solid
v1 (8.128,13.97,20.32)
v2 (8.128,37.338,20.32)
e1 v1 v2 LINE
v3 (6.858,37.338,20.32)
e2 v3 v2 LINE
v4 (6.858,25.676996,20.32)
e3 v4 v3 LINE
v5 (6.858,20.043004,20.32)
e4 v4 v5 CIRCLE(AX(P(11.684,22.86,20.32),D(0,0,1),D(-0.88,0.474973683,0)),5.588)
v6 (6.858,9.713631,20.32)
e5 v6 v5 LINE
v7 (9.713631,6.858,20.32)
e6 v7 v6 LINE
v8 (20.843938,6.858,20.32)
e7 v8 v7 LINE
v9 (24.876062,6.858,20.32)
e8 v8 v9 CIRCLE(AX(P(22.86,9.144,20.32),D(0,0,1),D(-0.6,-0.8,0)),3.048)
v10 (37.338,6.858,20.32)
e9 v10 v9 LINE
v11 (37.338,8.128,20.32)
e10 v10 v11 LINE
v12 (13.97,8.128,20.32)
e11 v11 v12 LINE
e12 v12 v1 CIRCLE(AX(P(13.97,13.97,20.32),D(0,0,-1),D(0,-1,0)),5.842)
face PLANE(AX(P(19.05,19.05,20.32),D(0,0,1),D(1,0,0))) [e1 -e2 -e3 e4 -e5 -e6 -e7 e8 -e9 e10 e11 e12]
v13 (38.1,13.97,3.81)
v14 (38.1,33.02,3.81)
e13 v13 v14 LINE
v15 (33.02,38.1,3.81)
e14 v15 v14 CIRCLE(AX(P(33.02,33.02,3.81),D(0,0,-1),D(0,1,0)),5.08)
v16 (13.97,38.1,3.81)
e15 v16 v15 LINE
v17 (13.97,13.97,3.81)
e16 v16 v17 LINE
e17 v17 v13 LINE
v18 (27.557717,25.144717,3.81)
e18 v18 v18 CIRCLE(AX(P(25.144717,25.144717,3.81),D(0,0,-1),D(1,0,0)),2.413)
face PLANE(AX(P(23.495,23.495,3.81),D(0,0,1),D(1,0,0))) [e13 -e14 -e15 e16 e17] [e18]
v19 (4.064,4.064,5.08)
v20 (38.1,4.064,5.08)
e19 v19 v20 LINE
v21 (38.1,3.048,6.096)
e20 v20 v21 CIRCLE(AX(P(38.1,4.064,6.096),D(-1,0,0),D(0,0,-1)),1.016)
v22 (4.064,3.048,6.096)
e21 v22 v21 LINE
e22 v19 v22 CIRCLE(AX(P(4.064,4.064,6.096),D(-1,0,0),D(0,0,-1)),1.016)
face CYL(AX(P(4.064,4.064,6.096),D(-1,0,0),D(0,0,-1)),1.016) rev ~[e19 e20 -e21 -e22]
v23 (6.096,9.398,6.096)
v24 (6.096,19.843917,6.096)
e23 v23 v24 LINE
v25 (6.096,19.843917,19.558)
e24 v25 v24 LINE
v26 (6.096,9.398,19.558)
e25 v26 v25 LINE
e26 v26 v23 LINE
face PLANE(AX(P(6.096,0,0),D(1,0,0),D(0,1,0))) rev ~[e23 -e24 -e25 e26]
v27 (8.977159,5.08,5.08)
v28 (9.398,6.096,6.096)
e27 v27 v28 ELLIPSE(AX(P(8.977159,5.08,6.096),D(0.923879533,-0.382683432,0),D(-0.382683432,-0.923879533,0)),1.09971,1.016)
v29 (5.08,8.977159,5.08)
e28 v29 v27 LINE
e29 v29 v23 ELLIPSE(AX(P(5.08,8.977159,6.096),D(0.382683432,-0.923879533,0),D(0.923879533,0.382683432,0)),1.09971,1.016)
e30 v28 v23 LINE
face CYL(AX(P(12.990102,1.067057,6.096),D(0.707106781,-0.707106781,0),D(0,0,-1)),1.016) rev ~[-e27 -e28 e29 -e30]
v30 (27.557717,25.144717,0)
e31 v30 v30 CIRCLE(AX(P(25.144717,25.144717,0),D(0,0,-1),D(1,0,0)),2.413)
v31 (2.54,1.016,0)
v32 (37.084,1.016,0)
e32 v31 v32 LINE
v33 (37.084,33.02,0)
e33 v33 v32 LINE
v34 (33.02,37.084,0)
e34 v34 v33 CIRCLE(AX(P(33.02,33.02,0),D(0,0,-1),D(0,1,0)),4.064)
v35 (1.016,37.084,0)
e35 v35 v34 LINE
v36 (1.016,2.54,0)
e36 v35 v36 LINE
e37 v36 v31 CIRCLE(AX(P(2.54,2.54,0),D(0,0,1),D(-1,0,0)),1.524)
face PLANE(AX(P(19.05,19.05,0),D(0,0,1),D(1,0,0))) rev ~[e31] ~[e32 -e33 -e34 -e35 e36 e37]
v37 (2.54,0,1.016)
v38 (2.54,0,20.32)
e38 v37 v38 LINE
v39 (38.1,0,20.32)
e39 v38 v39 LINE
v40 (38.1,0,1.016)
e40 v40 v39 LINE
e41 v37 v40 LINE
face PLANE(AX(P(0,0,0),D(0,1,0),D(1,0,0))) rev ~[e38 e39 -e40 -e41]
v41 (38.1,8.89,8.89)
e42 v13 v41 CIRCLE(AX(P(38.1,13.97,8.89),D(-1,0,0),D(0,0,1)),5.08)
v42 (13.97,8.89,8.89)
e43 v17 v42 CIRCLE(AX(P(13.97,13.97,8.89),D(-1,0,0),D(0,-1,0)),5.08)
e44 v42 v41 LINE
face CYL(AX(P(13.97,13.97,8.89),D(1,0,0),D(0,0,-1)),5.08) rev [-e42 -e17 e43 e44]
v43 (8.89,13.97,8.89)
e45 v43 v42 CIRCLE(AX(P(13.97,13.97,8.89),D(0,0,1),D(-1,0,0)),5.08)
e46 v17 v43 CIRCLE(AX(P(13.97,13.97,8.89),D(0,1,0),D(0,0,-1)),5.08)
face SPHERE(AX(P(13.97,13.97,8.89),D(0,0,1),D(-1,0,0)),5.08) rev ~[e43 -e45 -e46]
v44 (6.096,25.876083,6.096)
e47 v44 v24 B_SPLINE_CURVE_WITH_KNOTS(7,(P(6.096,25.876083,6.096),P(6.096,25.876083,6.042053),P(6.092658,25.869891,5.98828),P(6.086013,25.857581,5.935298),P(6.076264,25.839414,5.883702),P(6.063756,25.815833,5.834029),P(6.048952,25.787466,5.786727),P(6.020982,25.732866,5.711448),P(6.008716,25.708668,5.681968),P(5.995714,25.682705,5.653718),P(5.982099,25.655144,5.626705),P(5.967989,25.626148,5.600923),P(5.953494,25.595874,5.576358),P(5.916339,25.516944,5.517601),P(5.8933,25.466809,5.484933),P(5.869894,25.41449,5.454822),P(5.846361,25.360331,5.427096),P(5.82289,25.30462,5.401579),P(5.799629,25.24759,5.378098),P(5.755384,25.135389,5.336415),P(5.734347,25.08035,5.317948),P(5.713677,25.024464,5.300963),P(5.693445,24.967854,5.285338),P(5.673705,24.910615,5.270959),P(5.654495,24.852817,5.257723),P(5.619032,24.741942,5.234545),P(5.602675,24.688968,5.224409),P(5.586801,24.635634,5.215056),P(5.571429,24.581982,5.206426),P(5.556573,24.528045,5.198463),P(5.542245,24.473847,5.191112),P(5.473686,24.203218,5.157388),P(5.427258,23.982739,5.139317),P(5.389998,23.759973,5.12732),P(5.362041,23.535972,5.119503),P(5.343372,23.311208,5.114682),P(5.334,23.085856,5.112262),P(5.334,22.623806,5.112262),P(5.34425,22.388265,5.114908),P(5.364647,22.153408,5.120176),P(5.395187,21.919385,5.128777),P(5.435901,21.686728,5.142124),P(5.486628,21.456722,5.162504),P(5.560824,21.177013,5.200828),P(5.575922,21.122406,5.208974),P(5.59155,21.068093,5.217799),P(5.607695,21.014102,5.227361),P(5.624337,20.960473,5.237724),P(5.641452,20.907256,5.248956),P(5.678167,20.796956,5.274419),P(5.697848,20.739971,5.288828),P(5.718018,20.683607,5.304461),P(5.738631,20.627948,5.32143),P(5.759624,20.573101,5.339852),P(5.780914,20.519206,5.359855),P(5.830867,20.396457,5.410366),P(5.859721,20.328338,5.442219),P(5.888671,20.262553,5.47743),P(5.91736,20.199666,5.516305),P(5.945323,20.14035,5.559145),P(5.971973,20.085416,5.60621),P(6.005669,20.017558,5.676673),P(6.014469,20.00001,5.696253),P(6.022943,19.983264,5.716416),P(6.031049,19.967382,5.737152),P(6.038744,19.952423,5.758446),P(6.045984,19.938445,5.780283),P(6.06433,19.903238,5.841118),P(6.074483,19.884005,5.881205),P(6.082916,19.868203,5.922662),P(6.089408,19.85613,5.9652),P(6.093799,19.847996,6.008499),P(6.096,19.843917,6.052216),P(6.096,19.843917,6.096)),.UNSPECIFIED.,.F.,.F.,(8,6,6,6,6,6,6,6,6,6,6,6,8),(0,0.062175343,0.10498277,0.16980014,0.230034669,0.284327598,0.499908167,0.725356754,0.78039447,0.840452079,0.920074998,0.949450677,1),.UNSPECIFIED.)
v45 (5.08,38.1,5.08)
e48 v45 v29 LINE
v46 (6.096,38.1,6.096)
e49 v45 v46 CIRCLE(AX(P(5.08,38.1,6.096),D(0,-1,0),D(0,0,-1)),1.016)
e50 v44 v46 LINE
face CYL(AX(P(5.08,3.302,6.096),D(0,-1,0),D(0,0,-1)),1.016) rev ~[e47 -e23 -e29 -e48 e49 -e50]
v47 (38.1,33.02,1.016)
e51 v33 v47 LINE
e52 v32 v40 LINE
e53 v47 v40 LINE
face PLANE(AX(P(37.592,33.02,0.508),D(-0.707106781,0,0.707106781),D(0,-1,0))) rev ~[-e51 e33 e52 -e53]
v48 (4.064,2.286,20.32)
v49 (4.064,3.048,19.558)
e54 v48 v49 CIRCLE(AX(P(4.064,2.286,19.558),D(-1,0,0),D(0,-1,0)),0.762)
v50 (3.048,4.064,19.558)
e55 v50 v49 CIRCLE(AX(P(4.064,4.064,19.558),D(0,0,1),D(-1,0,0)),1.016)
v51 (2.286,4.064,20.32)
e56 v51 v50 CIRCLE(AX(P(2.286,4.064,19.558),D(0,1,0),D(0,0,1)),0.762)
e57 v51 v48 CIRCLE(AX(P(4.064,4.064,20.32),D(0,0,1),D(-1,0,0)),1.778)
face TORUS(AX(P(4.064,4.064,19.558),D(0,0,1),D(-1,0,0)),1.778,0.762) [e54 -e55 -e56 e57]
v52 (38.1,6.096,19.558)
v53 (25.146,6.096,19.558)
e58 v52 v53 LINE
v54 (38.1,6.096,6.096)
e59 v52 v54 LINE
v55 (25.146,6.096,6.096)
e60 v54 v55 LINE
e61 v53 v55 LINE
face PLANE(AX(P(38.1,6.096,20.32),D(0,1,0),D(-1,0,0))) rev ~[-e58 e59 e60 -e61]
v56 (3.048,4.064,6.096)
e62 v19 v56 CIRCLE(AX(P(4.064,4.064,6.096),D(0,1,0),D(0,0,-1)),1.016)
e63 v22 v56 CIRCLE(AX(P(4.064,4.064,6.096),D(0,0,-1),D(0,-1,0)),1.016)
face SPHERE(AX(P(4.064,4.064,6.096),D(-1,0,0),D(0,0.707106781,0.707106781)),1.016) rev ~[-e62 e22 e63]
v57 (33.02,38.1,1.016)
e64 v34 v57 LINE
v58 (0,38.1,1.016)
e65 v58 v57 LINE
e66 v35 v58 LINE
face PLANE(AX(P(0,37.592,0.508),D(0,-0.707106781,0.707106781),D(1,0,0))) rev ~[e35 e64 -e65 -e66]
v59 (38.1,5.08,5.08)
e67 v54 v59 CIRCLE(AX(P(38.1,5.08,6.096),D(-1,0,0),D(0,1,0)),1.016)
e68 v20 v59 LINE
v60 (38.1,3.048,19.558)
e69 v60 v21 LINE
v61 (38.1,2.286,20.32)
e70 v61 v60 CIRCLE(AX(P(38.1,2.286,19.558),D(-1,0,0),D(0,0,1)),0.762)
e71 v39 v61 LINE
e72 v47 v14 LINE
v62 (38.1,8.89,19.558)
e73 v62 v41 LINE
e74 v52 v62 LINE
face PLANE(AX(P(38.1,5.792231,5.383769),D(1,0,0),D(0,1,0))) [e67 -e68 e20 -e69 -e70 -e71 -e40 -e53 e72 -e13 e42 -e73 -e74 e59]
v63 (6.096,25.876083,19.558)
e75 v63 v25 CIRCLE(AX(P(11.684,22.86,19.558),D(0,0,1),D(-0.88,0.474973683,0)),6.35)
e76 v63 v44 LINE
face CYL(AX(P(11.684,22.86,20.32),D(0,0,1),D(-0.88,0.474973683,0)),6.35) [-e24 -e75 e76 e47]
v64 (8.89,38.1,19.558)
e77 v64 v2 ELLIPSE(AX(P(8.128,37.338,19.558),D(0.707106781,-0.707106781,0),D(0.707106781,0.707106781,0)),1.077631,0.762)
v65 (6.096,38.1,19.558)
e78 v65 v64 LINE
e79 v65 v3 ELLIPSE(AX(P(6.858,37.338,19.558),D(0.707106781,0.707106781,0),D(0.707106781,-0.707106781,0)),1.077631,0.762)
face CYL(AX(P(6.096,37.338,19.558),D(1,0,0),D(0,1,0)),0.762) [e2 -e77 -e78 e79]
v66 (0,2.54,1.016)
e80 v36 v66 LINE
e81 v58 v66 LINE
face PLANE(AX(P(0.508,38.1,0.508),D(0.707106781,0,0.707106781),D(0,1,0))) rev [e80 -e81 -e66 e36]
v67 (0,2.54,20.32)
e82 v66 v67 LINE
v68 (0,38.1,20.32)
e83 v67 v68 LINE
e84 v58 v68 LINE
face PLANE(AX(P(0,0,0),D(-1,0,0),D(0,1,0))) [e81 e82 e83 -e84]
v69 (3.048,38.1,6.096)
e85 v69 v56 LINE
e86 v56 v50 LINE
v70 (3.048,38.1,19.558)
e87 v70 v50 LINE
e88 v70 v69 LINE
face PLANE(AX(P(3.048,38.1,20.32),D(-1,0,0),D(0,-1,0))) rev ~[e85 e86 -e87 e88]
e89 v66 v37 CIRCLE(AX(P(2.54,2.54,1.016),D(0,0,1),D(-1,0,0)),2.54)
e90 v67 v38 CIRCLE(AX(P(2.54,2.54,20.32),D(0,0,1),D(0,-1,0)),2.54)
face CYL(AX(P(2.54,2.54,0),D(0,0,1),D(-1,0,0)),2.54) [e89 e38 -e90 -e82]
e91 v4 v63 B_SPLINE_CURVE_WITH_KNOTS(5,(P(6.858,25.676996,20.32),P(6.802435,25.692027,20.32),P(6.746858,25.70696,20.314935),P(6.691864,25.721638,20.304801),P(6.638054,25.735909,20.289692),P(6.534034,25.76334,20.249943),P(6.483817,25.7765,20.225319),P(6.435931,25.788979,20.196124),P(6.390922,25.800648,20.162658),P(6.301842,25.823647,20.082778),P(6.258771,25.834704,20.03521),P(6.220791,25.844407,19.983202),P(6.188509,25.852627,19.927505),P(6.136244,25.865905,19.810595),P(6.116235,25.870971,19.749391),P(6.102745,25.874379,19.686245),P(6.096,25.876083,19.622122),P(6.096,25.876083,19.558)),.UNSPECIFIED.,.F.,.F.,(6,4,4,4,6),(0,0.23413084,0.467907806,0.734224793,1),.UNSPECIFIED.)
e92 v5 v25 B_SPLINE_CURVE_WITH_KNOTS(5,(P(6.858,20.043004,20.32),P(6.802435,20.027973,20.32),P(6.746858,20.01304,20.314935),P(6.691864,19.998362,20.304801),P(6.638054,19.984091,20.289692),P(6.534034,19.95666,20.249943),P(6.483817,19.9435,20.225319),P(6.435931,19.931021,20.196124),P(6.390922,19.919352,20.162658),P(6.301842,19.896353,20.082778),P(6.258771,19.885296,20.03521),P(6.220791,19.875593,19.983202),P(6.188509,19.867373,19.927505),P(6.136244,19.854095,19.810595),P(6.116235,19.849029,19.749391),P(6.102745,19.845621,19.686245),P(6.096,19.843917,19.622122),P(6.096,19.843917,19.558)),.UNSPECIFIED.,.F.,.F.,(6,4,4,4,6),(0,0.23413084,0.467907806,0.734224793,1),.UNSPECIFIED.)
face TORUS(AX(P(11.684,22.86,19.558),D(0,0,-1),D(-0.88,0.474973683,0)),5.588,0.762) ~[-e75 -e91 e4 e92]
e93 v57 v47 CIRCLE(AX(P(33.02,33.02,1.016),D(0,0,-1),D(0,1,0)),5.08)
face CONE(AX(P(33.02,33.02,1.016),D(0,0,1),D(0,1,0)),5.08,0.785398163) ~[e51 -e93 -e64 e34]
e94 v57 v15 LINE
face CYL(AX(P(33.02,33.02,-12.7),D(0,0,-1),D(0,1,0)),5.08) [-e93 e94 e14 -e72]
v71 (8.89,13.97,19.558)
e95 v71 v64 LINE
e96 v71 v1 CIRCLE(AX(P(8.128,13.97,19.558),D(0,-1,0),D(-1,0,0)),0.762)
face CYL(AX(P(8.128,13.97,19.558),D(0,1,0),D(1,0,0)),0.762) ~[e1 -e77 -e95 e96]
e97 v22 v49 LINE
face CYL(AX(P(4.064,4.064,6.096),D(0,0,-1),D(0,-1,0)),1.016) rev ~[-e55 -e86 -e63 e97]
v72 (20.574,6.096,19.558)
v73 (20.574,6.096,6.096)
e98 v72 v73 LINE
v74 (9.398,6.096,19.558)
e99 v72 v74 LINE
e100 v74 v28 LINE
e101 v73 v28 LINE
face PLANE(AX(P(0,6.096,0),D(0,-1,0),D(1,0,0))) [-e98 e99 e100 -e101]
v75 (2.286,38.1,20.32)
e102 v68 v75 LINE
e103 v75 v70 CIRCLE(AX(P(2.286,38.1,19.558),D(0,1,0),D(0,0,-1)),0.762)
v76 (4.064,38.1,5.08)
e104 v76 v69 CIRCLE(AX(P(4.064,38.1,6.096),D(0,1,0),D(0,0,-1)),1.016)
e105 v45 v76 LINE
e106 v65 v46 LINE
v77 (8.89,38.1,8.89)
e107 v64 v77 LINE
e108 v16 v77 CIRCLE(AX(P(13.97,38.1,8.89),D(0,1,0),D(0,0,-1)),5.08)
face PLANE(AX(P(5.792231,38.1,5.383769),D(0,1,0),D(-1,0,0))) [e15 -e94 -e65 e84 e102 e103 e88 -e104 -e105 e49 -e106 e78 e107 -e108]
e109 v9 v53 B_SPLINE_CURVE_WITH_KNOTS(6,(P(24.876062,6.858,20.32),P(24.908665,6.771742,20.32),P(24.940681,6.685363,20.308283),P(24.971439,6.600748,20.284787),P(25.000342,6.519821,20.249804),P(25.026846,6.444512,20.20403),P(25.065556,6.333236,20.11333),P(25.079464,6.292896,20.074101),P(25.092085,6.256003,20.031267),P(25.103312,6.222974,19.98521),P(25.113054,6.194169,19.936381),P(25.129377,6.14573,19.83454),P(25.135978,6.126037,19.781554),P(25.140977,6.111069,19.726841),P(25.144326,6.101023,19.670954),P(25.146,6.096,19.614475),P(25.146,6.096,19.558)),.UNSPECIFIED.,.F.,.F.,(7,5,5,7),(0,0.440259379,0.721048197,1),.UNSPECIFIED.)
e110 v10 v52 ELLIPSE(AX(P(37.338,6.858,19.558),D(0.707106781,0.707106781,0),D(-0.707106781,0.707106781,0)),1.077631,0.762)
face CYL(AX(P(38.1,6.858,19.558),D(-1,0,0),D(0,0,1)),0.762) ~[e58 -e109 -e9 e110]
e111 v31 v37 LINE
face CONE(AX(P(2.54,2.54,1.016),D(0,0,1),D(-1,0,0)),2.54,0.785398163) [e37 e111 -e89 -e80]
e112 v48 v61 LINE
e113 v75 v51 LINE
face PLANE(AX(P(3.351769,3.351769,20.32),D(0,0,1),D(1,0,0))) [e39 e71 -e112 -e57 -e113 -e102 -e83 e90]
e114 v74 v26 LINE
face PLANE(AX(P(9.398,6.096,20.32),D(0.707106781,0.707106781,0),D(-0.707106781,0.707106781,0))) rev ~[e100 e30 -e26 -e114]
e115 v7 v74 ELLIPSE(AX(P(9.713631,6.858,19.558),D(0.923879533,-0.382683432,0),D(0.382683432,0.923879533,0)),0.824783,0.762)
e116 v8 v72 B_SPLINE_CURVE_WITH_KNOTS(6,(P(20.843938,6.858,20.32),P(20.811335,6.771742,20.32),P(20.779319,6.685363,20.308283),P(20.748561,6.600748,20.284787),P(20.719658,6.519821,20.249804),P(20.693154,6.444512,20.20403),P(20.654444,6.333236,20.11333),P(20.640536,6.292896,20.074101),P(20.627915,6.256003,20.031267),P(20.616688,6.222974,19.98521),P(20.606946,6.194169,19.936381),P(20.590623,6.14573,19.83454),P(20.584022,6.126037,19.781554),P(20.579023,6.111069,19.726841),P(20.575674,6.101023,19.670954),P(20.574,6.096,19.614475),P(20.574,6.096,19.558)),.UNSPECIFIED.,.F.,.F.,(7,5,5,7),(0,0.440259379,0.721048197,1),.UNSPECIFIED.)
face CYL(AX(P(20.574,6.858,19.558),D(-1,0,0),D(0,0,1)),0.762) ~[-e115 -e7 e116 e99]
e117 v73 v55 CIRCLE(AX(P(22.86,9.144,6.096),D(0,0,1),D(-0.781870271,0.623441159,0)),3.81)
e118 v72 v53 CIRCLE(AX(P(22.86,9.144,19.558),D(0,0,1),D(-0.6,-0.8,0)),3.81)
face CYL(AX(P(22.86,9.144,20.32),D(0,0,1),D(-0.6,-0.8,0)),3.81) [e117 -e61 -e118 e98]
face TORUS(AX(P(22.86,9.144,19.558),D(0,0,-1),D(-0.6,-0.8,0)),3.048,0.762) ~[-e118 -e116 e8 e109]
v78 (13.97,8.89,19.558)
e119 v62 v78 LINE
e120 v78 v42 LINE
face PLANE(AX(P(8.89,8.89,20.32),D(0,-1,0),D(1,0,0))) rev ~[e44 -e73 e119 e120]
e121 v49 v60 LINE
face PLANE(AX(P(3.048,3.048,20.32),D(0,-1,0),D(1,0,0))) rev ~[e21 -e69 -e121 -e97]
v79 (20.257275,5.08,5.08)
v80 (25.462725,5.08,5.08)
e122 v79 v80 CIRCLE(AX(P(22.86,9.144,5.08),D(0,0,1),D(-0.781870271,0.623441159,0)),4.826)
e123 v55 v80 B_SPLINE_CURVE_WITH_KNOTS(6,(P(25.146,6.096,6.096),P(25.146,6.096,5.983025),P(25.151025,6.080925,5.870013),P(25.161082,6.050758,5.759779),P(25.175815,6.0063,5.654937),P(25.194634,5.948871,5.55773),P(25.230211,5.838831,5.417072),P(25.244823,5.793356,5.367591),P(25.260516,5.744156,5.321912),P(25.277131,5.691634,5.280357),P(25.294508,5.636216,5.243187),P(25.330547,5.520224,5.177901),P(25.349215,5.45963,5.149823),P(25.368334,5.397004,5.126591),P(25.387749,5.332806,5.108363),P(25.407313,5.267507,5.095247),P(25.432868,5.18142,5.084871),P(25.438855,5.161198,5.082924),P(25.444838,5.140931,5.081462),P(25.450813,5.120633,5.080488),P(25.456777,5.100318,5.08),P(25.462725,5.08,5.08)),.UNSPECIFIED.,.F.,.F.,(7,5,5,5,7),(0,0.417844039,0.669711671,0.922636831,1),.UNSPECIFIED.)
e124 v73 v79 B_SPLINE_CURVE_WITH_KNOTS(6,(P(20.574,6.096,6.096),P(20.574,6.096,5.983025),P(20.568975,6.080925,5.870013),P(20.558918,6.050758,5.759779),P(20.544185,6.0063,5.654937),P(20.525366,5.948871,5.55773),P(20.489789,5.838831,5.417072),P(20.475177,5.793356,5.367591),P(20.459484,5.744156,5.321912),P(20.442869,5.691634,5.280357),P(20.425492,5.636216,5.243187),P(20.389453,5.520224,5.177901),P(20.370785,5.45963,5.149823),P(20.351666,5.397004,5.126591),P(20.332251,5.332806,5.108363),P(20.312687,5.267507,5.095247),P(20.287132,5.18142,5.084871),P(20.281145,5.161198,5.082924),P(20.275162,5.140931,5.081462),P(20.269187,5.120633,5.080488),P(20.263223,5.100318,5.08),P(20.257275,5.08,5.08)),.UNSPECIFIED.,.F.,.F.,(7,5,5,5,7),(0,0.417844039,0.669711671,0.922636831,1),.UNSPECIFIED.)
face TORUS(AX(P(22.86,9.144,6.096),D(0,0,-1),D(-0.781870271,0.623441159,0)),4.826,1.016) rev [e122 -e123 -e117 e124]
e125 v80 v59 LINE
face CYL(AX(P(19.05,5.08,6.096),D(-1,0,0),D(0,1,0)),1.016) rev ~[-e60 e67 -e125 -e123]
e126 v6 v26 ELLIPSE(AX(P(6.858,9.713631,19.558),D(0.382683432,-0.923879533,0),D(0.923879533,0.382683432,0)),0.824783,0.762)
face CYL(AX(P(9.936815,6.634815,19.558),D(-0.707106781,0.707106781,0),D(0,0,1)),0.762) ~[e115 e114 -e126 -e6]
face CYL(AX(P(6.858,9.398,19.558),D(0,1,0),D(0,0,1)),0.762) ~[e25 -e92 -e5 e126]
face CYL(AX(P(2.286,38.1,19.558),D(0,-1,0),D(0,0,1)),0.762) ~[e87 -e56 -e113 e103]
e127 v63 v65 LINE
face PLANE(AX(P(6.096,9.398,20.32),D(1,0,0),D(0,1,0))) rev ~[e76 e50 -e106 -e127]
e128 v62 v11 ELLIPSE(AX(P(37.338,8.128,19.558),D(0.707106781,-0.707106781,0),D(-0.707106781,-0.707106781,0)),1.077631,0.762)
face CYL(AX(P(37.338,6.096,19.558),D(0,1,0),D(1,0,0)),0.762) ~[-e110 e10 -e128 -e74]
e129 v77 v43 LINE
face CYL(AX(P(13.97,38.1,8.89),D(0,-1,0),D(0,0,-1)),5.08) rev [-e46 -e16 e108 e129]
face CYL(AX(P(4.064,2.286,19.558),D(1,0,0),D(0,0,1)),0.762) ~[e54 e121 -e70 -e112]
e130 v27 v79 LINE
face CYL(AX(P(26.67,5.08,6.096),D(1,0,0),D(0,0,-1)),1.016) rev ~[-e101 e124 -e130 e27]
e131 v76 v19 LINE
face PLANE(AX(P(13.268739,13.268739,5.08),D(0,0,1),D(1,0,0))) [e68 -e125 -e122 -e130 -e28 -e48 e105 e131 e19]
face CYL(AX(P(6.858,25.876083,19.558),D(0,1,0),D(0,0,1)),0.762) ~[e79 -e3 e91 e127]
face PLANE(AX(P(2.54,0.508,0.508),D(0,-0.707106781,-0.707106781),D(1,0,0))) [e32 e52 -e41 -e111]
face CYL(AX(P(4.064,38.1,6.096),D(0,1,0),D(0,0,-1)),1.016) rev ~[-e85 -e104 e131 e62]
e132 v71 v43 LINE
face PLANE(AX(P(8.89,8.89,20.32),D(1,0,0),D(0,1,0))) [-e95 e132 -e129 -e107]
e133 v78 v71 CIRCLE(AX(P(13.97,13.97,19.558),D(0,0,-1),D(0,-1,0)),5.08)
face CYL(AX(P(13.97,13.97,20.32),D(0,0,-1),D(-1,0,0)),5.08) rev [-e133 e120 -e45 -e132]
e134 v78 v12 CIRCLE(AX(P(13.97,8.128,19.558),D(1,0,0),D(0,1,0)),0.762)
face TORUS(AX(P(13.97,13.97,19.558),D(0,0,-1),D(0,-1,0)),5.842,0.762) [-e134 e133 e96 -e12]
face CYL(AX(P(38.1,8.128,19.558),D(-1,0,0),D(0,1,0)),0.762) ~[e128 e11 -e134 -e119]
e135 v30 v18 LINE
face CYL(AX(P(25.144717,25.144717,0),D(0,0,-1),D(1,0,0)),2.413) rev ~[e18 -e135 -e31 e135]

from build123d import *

# Parameters (mm, degrees)
F0_W          = 38.1
F0_H          = 38.1
F1_DEPTH      = 20.32
F2_W          = 29.21
F2_H          = 29.21
F3_DEPTH      = 16.51
F5_DEPTH      = 15.24
F6_T1_DEPTH   = 29.21
F7_R          = 5.08
F8_R          = 5.08
F9_R          = 2.54
F10_R         = 2.413
F11_DEPTH     = 20.321
F13_DEPTH     = 15.24
F14_T1_DEPTH  = 14.224
F14_T3_DEPTH  = 34.036
F14_T5_DEPTH  = 34.036
F14_T7_DEPTH  = 19.05
F14_T9_DEPTH  = 18.3199171099
F14_S13_W     = 1.03632
F14_S13_H     = 1.03632
F14_T14_DEPTH = 1.03632
F14_T20_DEPTH = 16.861733183
F14_T26_DEPTH = 22.6379171099
F14_T31_DEPTH = 23.368
F14_T36_ANGLE = 257.1357278548
F14_T42_DEPTH = 16.861733183
F14_T46_DEPTH = 23.368
F14_T53_DEPTH = 16.861733183
F14_T57_DEPTH = 22.6379171099
F15_SIZE      = 1.016
F16_R         = 0.762


# Not quite as in the source:
# - a fillet or chamfer that OpenCascade refuses, or shapes differently, is made with other operations: its cross-section is extruded or revolved along the edge and cut away or added


with BuildPart() as f1:
    # F0 (on Top) → F1 (new body)
    with BuildSketch(Plane.XY):
        with Locations((19.05, 19.05)):
            Rectangle(F0_W, F0_H)
    extrude(amount=F1_DEPTH)

    # F2 (on face) → F3 (cut)
    with BuildSketch(Plane.XY.offset(20.32)):
        with Locations((23.495, 23.495)):
            Rectangle(F2_W, F2_H)
    extrude(amount=-F3_DEPTH, mode=Mode.SUBTRACT)

    # F4 (on face) → F5 (cut)
    with BuildSketch(Plane.XY.offset(20.32)):
        Polygon((6.096, 38.1), (3.048, 38.1), (3.048, 3.048), (38.1, 3.048), (38.1, 6.096), (9.398, 6.096), (6.096, 6.096), (6.096, 9.398), align=None)
        Polygon((9.398, 6.096), (6.096, 9.398), (6.096, 6.096), align=None)
    extrude(amount=-F5_DEPTH, mode=Mode.SUBTRACT)

    # F6: fillet of radius 5.08 on 1 edges, made by hand

    # F6_s2 → F6_t1 (cut)
    with BuildSketch(Plane.XY.offset(-12.7)):
        with BuildLine():
            ThreePointArc((33.02, 38.1), (36.6121024484, 36.6121024484), (38.1, 33.02))
            Line((38.1, 33.02), (38.1, 38.1))
            Line((38.1, 38.1), (33.02, 38.1))
        make_face()
    extrude(amount=F6_T1_DEPTH, mode=Mode.SUBTRACT)

    # F7
    f7_edges = [f1.edges().sort_by_distance(p)[0] for p in [
        (8.89, 8.89, 12.065),
    ]]
    fillet(f7_edges, radius=F7_R)

    # F8
    f8_edges = [f1.edges().sort_by_distance(p)[0] for p in [
        (26.035, 8.89, 3.81),
        (10.377898, 10.377898, 3.81),
        (8.89, 26.035, 3.81),
    ]]
    fillet(f8_edges, radius=F8_R)

    # F9
    f9_edges = [f1.edges().sort_by_distance(p)[0] for p in [
        (0, 0, 10.16),
    ]]
    fillet(f9_edges, radius=F9_R)

    # F10 (on face) → F11 (cut, through all)
    with BuildSketch(Plane(origin=(0, 0, 0), x_dir=(1, 0, 0), z_dir=(0, 0, -1))):
        with Locations((25.144717139, -25.144717139)):
            Circle(F10_R)
    extrude(amount=-F11_DEPTH, mode=Mode.SUBTRACT)

    # F12 (on face) → F13 (join, through all)
    with BuildSketch(Plane.XY.offset(20.32)):
        with BuildLine():
            Line((25.146, 6.096), (20.574, 6.096))
            ThreePointArc((20.574, 6.096), (22.86, 5.334), (25.146, 6.096))
        make_face()
        with BuildLine():
            Line((6.096, 19.8439171099), (6.096, 25.8760828901))
            ThreePointArc((6.096, 25.8760828901), (5.334, 22.86), (6.096, 19.8439171099))
        make_face()
    extrude(amount=-F13_DEPTH)

    # F14: fillet of radius 1.016 on 9 edges, made by hand

    # F14_s2 → F14_t1 (join)
    with BuildSketch(Plane.XY.offset(6.096)):
        with BuildLine():
            ThreePointArc((4.064, 3.048), (3.3455795103, 3.3455795103), (3.048, 4.064))
            Line((3.048, 4.064), (3.02768, 4.064))
            Line((3.02768, 4.064), (3.02768, 3.02768))
            Line((3.02768, 3.02768), (4.064, 3.02768))
            Line((4.064, 3.02768), (4.064, 3.048))
        make_face()
    extrude(amount=F14_T1_DEPTH)

    # F14_s4 → F14_t3 (join)
    with BuildSketch(Plane.YZ.offset(4.064)):
        with BuildLine():
            ThreePointArc((4.064, 5.08), (3.3455795103, 5.3775795103), (3.048, 6.096))
            Line((3.048, 6.096), (3.02768, 6.096))
            Line((3.02768, 6.096), (3.02768, 5.05968))
            Line((3.02768, 5.05968), (4.064, 5.05968))
            Line((4.064, 5.05968), (4.064, 5.08))
        make_face()
    extrude(amount=F14_T3_DEPTH)

    # F14_s6 → F14_t5 (join)
    with BuildSketch(Plane.XZ.offset(-38.1)):
        with BuildLine():
            ThreePointArc((4.064, 5.08), (3.3455795103, 5.3775795103), (3.048, 6.096))
            Line((3.048, 6.096), (3.02768, 6.096))
            Line((3.02768, 6.096), (3.02768, 5.05968))
            Line((3.02768, 5.05968), (4.064, 5.05968))
            Line((4.064, 5.05968), (4.064, 5.08))
        make_face()
    extrude(amount=F14_T5_DEPTH)

    # F14_s8 → F14_t7 (join)
    with BuildSketch(Plane.YZ.offset(19.05)):
        with BuildLine():
            ThreePointArc((6.096, 6.096), (5.7984204897, 5.3775795103), (5.08, 5.08))
            Line((5.08, 5.08), (5.08, 5.05968))
            Line((5.08, 5.05968), (6.11632, 5.05968))
            Line((6.11632, 5.05968), (6.11632, 6.096))
            Line((6.11632, 6.096), (6.096, 6.096))
        make_face()
    extrude(amount=F14_T7_DEPTH)

    # F14_s10 → F14_t9 (join)
    with BuildSketch(Plane.XZ.offset(-38.1)):
        with BuildLine():
            ThreePointArc((5.08, 5.08), (5.7984204897, 5.3775795103), (6.096, 6.096))
            Line((6.096, 6.096), (6.11632, 6.096))
            Line((6.11632, 6.096), (6.11632, 5.05968))
            Line((6.11632, 5.05968), (5.08, 5.05968))
            Line((5.08, 5.05968), (5.08, 5.08))
        make_face()
    extrude(amount=F14_T9_DEPTH)


with BuildPart() as f14_tool12:
    # F14_s13 → F14_t14 (new body)
    with BuildSketch(Plane.YZ.offset(4.064)):
        with Locations((3.54584, 5.57784)):
            Rectangle(F14_S13_W, F14_S13_H)
    extrude(amount=-F14_T14_DEPTH)

    # F14_s15 → F14_t16 (revolve, cut)
    with BuildSketch(Plane(origin=(4.064, 4.064, 6.096), x_dir=(0, 0.7071067812, 0.7071067812), z_dir=(0, -0.7071067812, 0.7071067812))):
        with BuildLine():
            ThreePointArc((0, -1.016), (1.016, 0), (0, 1.016))
            Line((0, 1.016), (0, -1.016))
        make_face()
    revolve(axis=Axis((4.064, 4.064, 6.096), (-1, 0, 0)), mode=Mode.SUBTRACT)


with BuildPart() as f1_1:
    add(f1.part)

    # F14_t11: union F14_tool12
    add(f14_tool12.part)


with BuildPart() as f14_tool18:
    # F14_s19 → F14_t20 (new body)
    with BuildSketch(Plane(origin=(5.9615229381, -5.9615229381, 0), x_dir=(0, 0, 1), z_dir=(-0.7071067812, 0.7071067812, 0))):
        with BuildLine():
            ThreePointArc((5.08, 9.9399124677), (5.3775795103, 10.6583329574), (6.096, 10.9559124677))
            Line((6.096, 10.9559124677), (6.096, 10.9762324677))
            Line((6.096, 10.9762324677), (5.05968, 10.9762324677))
            Line((5.05968, 10.9762324677), (5.05968, 9.9399124677))
            Line((5.05968, 9.9399124677), (5.08, 9.9399124677))
        make_face()
    extrude(amount=F14_T20_DEPTH)

    split(bisect_by=Plane.YZ.offset(6.096), keep=Keep.TOP)

    split(bisect_by=Plane.XZ.offset(-6.096), keep=Keep.BOTTOM)


with BuildPart() as f1_2:
    add(f1_1.part)

    # F14_t17: union F14_tool18
    add(f14_tool18.part)


with BuildPart() as f14_tool24:
    # F14_s25 → F14_t26 (new body)
    with BuildSketch(Plane.XZ.offset(-3.302)):
        with BuildLine():
            ThreePointArc((5.08, 5.08), (5.7984204897, 5.3775795103), (6.096, 6.096))
            Line((6.096, 6.096), (6.11632, 6.096))
            Line((6.11632, 6.096), (6.11632, 5.05968))
            Line((6.11632, 5.05968), (5.08, 5.05968))
            Line((5.08, 5.05968), (5.08, 5.08))
        make_face()
    extrude(amount=-F14_T26_DEPTH)

    split(bisect_by=Plane(origin=(7.747, 7.747, 0), x_dir=(0, 0, 1), z_dir=(0.7071067812, 0.7071067812, 0)), keep=Keep.TOP)


with BuildPart() as f1_3:
    add(f1_2.part)

    # F14_t23: union F14_tool24
    add(f14_tool24.part)


with BuildPart() as f14_tool29:
    # F14_s30 → F14_t31 (new body)
    with BuildSketch(Plane.YZ.offset(26.67)):
        with BuildLine():
            ThreePointArc((5.08, 5.08), (5.7984204897, 5.3775795103), (6.096, 6.096))
            Line((6.096, 6.096), (6.11632, 6.096))
            Line((6.11632, 6.096), (6.11632, 5.05968))
            Line((6.11632, 5.05968), (5.08, 5.05968))
            Line((5.08, 5.05968), (5.08, 5.08))
        make_face()
    extrude(amount=-F14_T31_DEPTH)

    split(bisect_by=Plane(origin=(7.747, 7.747, 0), x_dir=(0, 0, 1), z_dir=(0.7071067812, 0.7071067812, 0)), keep=Keep.TOP)


with BuildPart() as f1_4:
    add(f1_3.part)

    # F14_t28: union F14_tool29
    add(f14_tool29.part)


with BuildPart() as f14_tool34:
    # F14_s35 → F14_t36 (revolve)
    with BuildSketch(Plane(origin=(13.3424429627, 16.7330298048, 0), x_dir=(0, 0, 1), z_dir=(0.6234411592, 0.7818702712, 0))):
        with BuildLine():
            ThreePointArc((5.08, 7.3468084408), (5.3775795103, 8.0652289305), (6.096, 8.3628084408))
            Line((6.096, 8.3628084408), (6.096, 8.3831284408))
            Line((6.096, 8.3831284408), (5.05968, 8.3831284408))
            Line((5.05968, 8.3831284408), (5.05968, 7.3468084408))
            Line((5.05968, 7.3468084408), (5.08, 7.3468084408))
        make_face()
    revolve(axis=Axis((22.86, 9.144, 5.08), (0, 0, 1)), revolution_arc=F14_T36_ANGLE)

    split(bisect_by=Plane.XZ.offset(-6.096), keep=Keep.TOP)


with BuildPart() as f1_5:
    add(f1_4.part)

    # F14_t33: union F14_tool34
    add(f14_tool34.part)


with BuildPart() as f14_tool40:
    # F14_s41 → F14_t42 (new body)
    with BuildSketch(Plane(origin=(5.9615229381, -5.9615229381, 0), x_dir=(0, 0, 1), z_dir=(-0.7071067812, 0.7071067812, 0))):
        with BuildLine():
            ThreePointArc((5.08, 9.9399124677), (5.3775795103, 10.6583329574), (6.096, 10.9559124677))
            Line((6.096, 10.9559124677), (6.096, 10.9762324677))
            Line((6.096, 10.9762324677), (5.05968, 10.9762324677))
            Line((5.05968, 10.9762324677), (5.05968, 9.9399124677))
            Line((5.05968, 9.9399124677), (5.08, 9.9399124677))
        make_face()
    extrude(amount=F14_T42_DEPTH)

    split(bisect_by=Plane.XZ.offset(-6.096), keep=Keep.TOP)


with BuildPart() as f14_tool44:
    # F14_s45 → F14_t46 (new body)
    with BuildSketch(Plane.YZ.offset(26.67)):
        with BuildLine():
            ThreePointArc((5.08, 5.08), (5.7984204897, 5.3775795103), (6.096, 6.096))
            Line((6.096, 6.096), (6.11632, 6.096))
            Line((6.11632, 6.096), (6.11632, 5.05968))
            Line((6.11632, 5.05968), (5.08, 5.05968))
            Line((5.08, 5.05968), (5.08, 5.08))
        make_face()
    extrude(amount=-F14_T46_DEPTH)

    split(bisect_by=Plane(origin=(7.747, 7.747, 0), x_dir=(0, 0, 1), z_dir=(-0.7071067812, -0.7071067812, 0)), keep=Keep.TOP)


with BuildPart() as f14_tool40_1:
    add(f14_tool40.part)

    # F14_t48: intersect F14_tool44
    add(f14_tool44.part, mode=Mode.INTERSECT)


with BuildPart() as f1_6:
    add(f1_5.part)

    # F14_t38: union F14_tool40
    add(f14_tool40_1.part)


with BuildPart() as f14_tool51:
    # F14_s52 → F14_t53 (new body)
    with BuildSketch(Plane(origin=(5.9615229381, -5.9615229381, 0), x_dir=(0, 0, 1), z_dir=(-0.7071067812, 0.7071067812, 0))):
        with BuildLine():
            ThreePointArc((5.08, 9.9399124677), (5.3775795103, 10.6583329574), (6.096, 10.9559124677))
            Line((6.096, 10.9559124677), (6.096, 10.9762324677))
            Line((6.096, 10.9762324677), (5.05968, 10.9762324677))
            Line((5.05968, 10.9762324677), (5.05968, 9.9399124677))
            Line((5.05968, 9.9399124677), (5.08, 9.9399124677))
        make_face()
    extrude(amount=F14_T53_DEPTH)

    split(bisect_by=Plane.YZ.offset(6.096), keep=Keep.BOTTOM)


with BuildPart() as f14_tool55:
    # F14_s56 → F14_t57 (new body)
    with BuildSketch(Plane.XZ.offset(-3.302)):
        with BuildLine():
            ThreePointArc((5.08, 5.08), (5.7984204897, 5.3775795103), (6.096, 6.096))
            Line((6.096, 6.096), (6.11632, 6.096))
            Line((6.11632, 6.096), (6.11632, 5.05968))
            Line((6.11632, 5.05968), (5.08, 5.05968))
            Line((5.08, 5.05968), (5.08, 5.08))
        make_face()
    extrude(amount=-F14_T57_DEPTH)

    split(bisect_by=Plane(origin=(7.747, 7.747, 0), x_dir=(0, 0, 1), z_dir=(-0.7071067812, -0.7071067812, 0)), keep=Keep.TOP)


with BuildPart() as f14_tool51_1:
    add(f14_tool51.part)

    # F14_t59: intersect F14_tool55
    add(f14_tool55.part, mode=Mode.INTERSECT)


with BuildPart() as f1_7:
    add(f1_6.part)

    # F14_t49: union F14_tool51
    add(f14_tool51_1.part)

    # F15
    f15_edges = [f1_7.edges().sort_by_distance(p)[0] for p in [
        (20.32, 0, 0),
        (16.51, 38.1, 0),
        (36.612102, 36.612102, 0),
        (0.743949, 0.743949, 0),
        (38.1, 16.51, 0),
        (0, 20.32, 0),
    ]]
    chamfer(f15_edges, length=F15_SIZE)

    # F16
    f16_edges = [f1_7.edges().sort_by_distance(p)[0] for p in [
        (3.048, 21.082, 20.32),
        (31.623, 6.096, 20.32),
        (22.86, 5.334, 20.32),
        (8.89, 26.035, 20.32),
        (7.493, 38.1, 20.32),
        (6.096, 31.988041, 20.32),
        (5.334, 22.86, 20.32),
        (6.096, 14.620959, 20.32),
        (7.747, 7.747, 20.32),
        (14.986, 6.096, 20.32),
        (38.1, 7.493, 20.32),
        (26.035, 8.89, 20.32),
        (10.377898, 10.377898, 20.32),
        (21.082, 3.048, 20.32),
        (3.34558, 3.34558, 20.32),
    ]]
    fillet(f16_edges, radius=F16_R)


solid = f1_7.part
